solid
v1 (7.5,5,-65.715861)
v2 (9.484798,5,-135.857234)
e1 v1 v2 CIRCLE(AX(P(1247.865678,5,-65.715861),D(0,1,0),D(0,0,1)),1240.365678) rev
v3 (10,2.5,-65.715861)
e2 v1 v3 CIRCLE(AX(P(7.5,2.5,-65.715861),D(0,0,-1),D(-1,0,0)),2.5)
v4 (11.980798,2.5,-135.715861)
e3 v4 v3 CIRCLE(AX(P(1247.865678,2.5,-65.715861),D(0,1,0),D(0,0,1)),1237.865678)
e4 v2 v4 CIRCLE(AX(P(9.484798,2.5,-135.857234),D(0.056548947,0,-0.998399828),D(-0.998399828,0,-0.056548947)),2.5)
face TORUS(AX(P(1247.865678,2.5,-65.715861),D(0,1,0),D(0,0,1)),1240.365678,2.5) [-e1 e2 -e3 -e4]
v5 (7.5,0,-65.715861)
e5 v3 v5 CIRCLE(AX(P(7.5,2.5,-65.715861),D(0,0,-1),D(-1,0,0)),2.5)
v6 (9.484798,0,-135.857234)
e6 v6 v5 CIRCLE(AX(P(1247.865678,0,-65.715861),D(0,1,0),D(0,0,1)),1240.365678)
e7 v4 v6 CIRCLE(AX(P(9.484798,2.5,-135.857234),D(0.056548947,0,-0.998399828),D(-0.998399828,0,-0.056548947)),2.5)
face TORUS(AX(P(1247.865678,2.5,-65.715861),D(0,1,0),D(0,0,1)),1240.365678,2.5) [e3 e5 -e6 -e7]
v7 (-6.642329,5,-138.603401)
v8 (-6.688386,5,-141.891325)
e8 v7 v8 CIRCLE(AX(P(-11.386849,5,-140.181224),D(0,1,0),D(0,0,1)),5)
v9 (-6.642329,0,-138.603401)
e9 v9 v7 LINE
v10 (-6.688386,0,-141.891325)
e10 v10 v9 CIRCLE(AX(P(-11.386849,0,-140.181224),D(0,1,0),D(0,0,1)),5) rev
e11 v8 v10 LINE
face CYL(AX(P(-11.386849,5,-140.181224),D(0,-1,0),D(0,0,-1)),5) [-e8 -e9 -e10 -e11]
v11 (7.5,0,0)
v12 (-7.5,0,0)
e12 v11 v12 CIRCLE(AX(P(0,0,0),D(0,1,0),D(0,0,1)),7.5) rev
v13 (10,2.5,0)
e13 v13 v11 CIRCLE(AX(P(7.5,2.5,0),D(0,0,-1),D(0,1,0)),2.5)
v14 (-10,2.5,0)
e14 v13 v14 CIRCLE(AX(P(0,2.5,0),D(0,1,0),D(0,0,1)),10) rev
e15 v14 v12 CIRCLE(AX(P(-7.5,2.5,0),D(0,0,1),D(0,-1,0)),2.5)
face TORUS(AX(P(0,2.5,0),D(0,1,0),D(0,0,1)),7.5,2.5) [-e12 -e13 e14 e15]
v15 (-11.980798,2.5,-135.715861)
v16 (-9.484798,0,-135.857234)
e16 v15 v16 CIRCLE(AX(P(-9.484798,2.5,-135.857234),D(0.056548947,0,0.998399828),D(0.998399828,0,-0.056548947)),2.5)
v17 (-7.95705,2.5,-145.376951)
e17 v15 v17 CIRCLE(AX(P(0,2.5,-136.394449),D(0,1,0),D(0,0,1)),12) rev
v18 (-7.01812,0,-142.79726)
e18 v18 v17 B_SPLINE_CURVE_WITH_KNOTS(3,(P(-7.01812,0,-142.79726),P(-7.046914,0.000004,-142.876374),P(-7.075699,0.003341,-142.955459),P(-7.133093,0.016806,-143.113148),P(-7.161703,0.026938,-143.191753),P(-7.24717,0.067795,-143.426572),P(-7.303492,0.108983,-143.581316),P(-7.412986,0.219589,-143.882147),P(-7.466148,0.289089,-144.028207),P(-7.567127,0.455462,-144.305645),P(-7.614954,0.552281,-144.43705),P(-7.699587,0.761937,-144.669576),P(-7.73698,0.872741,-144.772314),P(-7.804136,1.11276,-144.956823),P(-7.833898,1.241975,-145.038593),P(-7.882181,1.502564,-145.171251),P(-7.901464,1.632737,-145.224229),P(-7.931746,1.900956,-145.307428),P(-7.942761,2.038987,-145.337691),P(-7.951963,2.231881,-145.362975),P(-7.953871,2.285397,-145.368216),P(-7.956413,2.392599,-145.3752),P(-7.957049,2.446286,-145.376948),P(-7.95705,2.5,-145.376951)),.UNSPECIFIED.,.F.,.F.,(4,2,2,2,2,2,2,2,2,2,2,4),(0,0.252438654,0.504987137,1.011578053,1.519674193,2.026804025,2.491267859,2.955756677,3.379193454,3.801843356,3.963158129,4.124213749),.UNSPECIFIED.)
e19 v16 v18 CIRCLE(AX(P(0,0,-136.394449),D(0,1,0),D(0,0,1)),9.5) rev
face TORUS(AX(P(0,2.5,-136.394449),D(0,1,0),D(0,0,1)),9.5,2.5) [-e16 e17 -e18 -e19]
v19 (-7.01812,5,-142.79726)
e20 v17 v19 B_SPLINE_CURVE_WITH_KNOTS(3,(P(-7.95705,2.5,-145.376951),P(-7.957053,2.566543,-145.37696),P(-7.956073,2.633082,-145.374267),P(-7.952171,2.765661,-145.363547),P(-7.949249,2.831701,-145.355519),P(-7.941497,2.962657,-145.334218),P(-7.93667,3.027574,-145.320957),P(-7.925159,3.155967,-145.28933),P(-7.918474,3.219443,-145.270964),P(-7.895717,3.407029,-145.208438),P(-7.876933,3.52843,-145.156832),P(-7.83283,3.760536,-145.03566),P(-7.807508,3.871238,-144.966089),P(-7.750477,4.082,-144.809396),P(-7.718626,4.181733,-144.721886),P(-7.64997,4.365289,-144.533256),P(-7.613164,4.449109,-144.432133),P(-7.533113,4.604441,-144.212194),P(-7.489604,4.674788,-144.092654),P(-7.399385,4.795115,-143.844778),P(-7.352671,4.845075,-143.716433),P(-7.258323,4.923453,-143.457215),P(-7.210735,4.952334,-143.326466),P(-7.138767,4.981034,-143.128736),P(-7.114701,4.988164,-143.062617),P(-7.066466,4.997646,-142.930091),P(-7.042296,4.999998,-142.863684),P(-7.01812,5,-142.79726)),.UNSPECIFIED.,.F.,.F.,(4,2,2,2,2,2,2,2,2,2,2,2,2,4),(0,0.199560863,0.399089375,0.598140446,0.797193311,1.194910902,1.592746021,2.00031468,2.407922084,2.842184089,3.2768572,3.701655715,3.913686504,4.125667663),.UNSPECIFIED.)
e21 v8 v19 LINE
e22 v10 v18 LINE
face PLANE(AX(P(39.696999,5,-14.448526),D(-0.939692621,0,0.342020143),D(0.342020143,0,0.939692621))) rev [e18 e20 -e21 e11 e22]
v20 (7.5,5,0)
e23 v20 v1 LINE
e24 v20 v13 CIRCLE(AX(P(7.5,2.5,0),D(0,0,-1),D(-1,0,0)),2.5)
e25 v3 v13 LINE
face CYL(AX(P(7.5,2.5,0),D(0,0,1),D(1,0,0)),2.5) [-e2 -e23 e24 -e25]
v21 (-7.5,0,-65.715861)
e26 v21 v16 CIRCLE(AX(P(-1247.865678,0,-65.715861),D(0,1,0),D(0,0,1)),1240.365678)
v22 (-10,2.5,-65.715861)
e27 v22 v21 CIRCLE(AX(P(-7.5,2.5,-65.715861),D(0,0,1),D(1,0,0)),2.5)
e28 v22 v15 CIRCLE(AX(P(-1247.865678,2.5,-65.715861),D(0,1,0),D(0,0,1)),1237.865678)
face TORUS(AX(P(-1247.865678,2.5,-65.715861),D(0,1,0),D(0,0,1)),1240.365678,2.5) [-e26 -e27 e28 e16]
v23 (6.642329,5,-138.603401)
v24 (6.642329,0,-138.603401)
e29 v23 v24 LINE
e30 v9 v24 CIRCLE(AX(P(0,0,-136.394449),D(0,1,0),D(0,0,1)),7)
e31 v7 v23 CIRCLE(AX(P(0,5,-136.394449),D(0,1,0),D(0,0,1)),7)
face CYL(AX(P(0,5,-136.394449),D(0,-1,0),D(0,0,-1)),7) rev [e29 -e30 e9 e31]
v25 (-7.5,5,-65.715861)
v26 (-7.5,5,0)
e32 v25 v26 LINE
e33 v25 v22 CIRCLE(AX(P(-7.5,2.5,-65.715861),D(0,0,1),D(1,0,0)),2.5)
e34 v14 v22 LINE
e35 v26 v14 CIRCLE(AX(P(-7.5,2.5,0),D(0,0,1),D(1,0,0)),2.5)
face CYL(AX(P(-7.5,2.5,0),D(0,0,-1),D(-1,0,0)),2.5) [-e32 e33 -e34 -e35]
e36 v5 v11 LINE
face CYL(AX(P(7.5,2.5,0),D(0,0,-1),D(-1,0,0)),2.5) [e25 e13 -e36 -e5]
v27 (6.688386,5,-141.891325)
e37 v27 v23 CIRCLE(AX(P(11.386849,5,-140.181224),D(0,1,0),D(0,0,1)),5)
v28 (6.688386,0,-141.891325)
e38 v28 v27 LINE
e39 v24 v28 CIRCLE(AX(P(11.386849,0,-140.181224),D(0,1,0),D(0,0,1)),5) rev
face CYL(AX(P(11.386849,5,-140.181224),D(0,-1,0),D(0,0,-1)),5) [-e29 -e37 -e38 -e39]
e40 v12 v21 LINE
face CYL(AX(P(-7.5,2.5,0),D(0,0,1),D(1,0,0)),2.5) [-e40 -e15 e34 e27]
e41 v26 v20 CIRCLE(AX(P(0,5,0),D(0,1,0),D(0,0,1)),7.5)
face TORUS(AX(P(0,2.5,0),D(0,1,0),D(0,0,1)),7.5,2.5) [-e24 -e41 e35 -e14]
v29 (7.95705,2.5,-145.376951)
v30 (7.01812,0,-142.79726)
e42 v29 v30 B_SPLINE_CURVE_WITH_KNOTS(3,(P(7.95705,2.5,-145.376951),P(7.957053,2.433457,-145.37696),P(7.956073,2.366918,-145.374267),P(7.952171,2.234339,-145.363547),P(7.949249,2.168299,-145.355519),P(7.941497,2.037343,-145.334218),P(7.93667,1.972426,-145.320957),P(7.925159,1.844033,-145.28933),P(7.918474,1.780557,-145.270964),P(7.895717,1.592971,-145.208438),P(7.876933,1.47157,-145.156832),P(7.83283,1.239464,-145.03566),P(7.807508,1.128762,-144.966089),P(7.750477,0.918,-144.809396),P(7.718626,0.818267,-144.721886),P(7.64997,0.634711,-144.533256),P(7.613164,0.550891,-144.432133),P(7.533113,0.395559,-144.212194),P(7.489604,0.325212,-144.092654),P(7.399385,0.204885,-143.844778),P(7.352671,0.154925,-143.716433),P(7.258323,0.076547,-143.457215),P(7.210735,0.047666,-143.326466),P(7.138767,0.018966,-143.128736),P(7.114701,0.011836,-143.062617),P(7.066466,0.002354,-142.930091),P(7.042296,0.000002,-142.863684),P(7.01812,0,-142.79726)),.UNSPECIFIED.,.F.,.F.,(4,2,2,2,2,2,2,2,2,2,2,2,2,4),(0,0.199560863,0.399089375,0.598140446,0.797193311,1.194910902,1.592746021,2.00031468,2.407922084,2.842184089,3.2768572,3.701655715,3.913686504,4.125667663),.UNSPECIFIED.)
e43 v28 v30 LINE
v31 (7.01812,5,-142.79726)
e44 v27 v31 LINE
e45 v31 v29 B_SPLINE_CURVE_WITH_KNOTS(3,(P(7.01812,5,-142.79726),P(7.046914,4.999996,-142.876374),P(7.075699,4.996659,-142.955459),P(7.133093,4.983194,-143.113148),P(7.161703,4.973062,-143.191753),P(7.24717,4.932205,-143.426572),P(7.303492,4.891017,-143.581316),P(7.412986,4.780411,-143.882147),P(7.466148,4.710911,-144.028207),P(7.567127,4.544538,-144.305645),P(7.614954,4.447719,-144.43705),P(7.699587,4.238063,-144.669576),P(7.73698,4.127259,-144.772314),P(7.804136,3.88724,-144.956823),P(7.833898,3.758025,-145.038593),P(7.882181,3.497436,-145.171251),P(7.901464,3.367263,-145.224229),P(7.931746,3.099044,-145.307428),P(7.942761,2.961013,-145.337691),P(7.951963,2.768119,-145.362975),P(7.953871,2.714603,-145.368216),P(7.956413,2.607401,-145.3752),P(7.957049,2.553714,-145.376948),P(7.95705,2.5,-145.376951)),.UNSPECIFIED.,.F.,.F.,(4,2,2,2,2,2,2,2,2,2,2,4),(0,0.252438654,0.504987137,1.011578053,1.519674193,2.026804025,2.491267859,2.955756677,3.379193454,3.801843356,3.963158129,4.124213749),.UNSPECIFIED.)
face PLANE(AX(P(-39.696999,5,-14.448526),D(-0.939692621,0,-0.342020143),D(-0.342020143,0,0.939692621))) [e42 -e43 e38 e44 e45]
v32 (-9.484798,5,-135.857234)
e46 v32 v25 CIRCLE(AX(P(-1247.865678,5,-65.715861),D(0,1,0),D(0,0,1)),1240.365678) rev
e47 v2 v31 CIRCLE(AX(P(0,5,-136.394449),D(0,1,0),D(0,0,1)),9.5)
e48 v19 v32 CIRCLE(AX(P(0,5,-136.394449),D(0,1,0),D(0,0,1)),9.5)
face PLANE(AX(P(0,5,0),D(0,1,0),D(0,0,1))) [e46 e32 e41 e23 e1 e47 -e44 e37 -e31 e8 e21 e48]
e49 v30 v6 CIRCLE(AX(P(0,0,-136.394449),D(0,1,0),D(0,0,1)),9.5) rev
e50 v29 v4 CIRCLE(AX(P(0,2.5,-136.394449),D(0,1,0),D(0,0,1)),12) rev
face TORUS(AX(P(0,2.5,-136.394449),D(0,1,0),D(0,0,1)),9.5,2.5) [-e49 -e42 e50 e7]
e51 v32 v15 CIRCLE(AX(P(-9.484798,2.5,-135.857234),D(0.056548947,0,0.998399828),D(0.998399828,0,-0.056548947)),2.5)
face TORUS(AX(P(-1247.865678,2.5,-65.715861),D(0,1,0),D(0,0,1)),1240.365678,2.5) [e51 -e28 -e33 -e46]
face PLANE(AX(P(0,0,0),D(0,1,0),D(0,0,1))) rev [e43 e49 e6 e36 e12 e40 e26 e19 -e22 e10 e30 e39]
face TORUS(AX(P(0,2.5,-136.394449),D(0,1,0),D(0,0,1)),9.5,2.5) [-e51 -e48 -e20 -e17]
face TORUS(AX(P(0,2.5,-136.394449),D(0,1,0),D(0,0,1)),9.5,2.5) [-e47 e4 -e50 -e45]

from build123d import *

# Parameters (mm, degrees)
BOSS_EXTRUDE1_DEPTH = 5
FILLET1_R           = 2.5
FILLET2_R           = 5


with BuildPart() as part:
    # Sketch1 → Boss-Extrude1 (new body)
    with BuildSketch(Plane(origin=(0, 0, 0), x_dir=(1, 0, 0), z_dir=(0, 1, 0))):
        with BuildLine():
            ThreePointArc((11.980797937, 135.715861366), (0, 124.394448725), (-11.980797937, 135.715861366))
            ThreePointArc((-11.980797937, 135.715861366), (-10.495298574, 100.729871278), (-10, 65.715861366))
            Line((-10, 65.715861366), (-10, 0))
            ThreePointArc((-10, 0), (0, -10), (10, 0))
            Line((10, 0), (10, 65.715861366))
            ThreePointArc((10, 65.715861366), (10.495298574, 100.729871278), (11.980797937, 135.715861366))
        make_face()
        with BuildLine():
            Line((-6, 140), (-7.957050212, 145.376951267))
            ThreePointArc((-7.957050212, 145.376951267), (0, 124.394448725), (7.957050212, 145.376951267))
            Line((7.957050212, 145.376951267), (6, 140))
            ThreePointArc((6, 140), (0, 129.394448725), (-6, 140))
        make_face()
    extrude(amount=BOSS_EXTRUDE1_DEPTH)

    # Fillet1
    fillet1_edges = [part.edges().sort_by_distance(p)[0] for p in [
        (11.077617601, 0, -141.008166128),
        (10.495298574, 0, -100.729871278),
        (10, 0, -32.857930683),
        (0, 0, 10),
        (-10, 0, -32.857930683),
        (-10.495298574, 0, -100.729871278),
        (11.077617601, 5, -141.008166128),
        (10.495298574, 5, -100.729871278),
        (10, 5, -32.857930683),
        (0, 5, 10),
        (-10, 5, -32.857930683),
        (-10.495298574, 5, -100.729871278),
        (-11.077617601, 0, -141.008166128),
        (-11.077617601, 5, -141.008166128),
    ]]
    fillet(fillet1_edges, radius=FILLET1_R - 0.0001)  # a hair under: the kernel refuses the full size

    # Fillet2
    fillet2_edges = [part.edges().sort_by_distance(p)[0] for p in [
        (-6, 2.5, -140),
        (6, 2.5, -140),
    ]]
    fillet(fillet2_edges, radius=FILLET2_R)


solid = part.part
